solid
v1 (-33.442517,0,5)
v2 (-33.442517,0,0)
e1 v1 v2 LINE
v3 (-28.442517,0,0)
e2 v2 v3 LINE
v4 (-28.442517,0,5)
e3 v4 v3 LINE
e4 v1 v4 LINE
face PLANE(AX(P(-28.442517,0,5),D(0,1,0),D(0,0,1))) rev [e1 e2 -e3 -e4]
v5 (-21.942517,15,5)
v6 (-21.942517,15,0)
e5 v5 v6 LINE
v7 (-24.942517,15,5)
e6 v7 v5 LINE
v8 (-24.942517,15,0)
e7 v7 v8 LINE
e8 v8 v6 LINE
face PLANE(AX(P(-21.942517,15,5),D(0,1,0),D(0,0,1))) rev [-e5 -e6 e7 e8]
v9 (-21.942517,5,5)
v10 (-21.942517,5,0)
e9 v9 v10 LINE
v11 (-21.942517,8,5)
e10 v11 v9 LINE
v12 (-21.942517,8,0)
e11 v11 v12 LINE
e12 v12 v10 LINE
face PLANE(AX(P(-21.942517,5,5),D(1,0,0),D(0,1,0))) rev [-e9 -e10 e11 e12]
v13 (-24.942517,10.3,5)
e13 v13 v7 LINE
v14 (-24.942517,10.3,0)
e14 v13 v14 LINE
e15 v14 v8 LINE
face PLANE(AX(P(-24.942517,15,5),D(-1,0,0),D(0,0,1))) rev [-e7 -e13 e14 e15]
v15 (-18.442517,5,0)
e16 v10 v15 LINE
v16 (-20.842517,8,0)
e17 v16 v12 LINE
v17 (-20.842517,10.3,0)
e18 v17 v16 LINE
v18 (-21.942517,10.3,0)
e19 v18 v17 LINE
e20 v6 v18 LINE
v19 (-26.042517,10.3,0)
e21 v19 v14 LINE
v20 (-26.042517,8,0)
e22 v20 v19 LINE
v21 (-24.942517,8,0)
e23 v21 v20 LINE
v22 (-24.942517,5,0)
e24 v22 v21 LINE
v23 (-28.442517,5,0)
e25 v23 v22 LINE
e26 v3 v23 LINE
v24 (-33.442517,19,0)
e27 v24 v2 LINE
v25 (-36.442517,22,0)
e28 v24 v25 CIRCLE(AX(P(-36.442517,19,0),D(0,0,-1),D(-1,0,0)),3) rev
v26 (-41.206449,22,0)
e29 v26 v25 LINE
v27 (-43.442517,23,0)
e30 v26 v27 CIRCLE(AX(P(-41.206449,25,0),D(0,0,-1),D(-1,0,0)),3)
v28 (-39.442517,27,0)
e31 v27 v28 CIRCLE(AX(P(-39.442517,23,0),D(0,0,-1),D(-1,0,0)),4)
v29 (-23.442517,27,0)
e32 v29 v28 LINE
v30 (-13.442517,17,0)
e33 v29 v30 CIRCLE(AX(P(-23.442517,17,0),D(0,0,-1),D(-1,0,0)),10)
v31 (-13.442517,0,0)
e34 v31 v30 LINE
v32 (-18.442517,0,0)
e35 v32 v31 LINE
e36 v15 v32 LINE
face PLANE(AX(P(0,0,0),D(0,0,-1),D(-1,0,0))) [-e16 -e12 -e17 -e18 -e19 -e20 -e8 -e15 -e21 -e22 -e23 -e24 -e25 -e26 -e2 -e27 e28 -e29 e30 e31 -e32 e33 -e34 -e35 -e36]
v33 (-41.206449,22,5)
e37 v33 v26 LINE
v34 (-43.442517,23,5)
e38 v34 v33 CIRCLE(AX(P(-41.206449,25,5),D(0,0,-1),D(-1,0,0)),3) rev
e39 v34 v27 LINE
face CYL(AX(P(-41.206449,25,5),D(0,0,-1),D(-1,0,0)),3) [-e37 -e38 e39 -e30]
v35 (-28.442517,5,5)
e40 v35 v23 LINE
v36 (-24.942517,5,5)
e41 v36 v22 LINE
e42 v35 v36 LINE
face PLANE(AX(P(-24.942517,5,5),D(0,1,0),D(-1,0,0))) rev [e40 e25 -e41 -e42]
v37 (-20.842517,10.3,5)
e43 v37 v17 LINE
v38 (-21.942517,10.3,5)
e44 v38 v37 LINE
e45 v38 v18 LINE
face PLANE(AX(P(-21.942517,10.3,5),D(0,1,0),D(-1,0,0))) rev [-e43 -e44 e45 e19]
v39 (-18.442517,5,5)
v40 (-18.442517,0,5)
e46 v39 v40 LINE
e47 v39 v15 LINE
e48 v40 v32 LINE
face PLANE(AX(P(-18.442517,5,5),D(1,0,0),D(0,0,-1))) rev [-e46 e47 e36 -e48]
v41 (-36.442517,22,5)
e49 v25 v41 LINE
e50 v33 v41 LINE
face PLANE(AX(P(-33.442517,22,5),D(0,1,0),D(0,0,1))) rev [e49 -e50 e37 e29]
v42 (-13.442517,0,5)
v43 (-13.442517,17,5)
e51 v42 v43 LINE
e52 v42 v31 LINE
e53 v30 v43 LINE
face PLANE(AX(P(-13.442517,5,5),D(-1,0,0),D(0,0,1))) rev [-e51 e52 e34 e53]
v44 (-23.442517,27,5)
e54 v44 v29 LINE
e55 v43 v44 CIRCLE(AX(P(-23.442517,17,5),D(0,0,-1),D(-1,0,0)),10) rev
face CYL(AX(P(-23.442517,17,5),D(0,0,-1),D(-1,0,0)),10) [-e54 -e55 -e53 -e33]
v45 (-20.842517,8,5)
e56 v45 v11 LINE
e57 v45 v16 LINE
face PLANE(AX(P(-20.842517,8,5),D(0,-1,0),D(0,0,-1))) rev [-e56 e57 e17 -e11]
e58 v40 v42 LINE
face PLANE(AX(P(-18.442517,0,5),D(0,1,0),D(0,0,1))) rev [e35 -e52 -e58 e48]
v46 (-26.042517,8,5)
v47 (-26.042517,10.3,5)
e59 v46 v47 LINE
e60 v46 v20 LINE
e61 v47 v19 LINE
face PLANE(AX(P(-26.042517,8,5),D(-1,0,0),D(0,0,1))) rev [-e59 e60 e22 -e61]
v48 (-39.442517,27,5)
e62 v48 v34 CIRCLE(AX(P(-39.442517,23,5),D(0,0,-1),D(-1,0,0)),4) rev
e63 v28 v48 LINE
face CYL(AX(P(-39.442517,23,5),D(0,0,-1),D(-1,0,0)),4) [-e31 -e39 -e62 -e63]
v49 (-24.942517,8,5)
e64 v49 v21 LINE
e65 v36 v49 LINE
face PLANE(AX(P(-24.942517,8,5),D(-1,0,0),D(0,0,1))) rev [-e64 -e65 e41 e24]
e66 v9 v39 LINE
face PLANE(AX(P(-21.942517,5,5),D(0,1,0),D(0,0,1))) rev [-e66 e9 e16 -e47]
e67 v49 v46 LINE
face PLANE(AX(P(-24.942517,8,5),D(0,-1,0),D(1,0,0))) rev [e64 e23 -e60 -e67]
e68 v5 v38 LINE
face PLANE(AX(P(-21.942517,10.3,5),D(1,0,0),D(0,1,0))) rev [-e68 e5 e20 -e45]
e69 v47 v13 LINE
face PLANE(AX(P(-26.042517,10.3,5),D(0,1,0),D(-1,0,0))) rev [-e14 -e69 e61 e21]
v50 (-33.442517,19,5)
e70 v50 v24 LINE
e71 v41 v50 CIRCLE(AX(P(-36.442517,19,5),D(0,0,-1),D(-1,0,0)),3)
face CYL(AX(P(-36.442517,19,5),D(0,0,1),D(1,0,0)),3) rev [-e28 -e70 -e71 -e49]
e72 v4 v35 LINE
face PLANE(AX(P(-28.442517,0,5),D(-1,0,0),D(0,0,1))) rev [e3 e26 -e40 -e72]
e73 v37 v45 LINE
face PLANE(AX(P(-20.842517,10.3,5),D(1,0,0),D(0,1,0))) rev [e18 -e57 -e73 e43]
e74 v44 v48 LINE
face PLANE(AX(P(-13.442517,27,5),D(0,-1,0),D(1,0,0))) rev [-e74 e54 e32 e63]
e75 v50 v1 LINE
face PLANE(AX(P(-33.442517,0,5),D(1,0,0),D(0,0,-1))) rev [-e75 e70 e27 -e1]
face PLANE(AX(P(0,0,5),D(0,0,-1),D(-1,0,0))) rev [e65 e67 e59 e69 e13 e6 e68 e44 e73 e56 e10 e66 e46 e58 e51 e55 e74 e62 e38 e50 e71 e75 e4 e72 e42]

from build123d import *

# Parameters (mm, degrees)
BOSS_EXTRUDE1_DEPTH = 5
FILLET1_R           = 10
FILLET2_R           = 4
FILLET3_R           = 3


with BuildPart() as part:
    # Sketch1 → Boss-Extrude1 (new body)
    with BuildSketch(Plane.XY):
        Polygon((-24.942517195, 5), (-28.442517195, 5), (-28.442517195, 0), (-33.442517195, 0), (-33.442517195, 5), (-33.442517195, 22), (-43.442517195, 22), (-43.442517195, 27), (-13.442517195, 27), (-13.442517195, 5), (-13.442517195, 0), (-18.442517195, 0), (-18.442517195, 5), (-21.942517195, 5), (-21.942517195, 8), (-20.842517195, 8), (-20.842517195, 10.3), (-21.942517195, 10.3), (-21.942517195, 15), (-24.942517195, 15), (-24.942517195, 10.3), (-26.042517195, 10.3), (-26.042517195, 8), (-24.942517195, 8), align=None)
    extrude(amount=BOSS_EXTRUDE1_DEPTH)

    # Fillet1
    fillet1_edges = [part.edges().sort_by_distance(p)[0] for p in [
        (-13.442517195, 27, 2.5),
    ]]
    fillet(fillet1_edges, radius=FILLET1_R)

    # Fillet2
    fillet2_edges = [part.edges().sort_by_distance(p)[0] for p in [
        (-43.442517195, 27, 2.5),
    ]]
    fillet(fillet2_edges, radius=FILLET2_R)

    # Fillet3
    # the kernel refuses this fillet: 3 mm, written as the material it adds along each edge
    with BuildSketch(Plane(origin=(-33.442517195, 22, 0), x_dir=(-1, 0, 0), z_dir=(0, 0, 1))) as fillet3_piece_1:
        with BuildLine():
            CenterArc((FILLET3_R, FILLET3_R), FILLET3_R, 180, 90)
            Line((0, FILLET3_R), (0, 0))
            Line((0, 0), (FILLET3_R, 0))
        make_face()
    extrude(amount=5)
    # the kernel refuses this fillet: 3 mm, written as the material it takes off along each edge
    with BuildSketch(Plane(origin=(-43.442517195, 22, -5.590169944), x_dir=(0, 1, 0), z_dir=(0, 0, 1))) as fillet3_2_piece_1:
        with BuildLine():
            CenterArc((3, -2.236067977), FILLET3_R, 131.810314896, 48.189685104)
            Line((0, -2.236067977), (0, 0))
            Line((0, 0), (1, 0))
        make_face()
    extrude(amount=16.180339887, mode=Mode.SUBTRACT)


solid = part.part
